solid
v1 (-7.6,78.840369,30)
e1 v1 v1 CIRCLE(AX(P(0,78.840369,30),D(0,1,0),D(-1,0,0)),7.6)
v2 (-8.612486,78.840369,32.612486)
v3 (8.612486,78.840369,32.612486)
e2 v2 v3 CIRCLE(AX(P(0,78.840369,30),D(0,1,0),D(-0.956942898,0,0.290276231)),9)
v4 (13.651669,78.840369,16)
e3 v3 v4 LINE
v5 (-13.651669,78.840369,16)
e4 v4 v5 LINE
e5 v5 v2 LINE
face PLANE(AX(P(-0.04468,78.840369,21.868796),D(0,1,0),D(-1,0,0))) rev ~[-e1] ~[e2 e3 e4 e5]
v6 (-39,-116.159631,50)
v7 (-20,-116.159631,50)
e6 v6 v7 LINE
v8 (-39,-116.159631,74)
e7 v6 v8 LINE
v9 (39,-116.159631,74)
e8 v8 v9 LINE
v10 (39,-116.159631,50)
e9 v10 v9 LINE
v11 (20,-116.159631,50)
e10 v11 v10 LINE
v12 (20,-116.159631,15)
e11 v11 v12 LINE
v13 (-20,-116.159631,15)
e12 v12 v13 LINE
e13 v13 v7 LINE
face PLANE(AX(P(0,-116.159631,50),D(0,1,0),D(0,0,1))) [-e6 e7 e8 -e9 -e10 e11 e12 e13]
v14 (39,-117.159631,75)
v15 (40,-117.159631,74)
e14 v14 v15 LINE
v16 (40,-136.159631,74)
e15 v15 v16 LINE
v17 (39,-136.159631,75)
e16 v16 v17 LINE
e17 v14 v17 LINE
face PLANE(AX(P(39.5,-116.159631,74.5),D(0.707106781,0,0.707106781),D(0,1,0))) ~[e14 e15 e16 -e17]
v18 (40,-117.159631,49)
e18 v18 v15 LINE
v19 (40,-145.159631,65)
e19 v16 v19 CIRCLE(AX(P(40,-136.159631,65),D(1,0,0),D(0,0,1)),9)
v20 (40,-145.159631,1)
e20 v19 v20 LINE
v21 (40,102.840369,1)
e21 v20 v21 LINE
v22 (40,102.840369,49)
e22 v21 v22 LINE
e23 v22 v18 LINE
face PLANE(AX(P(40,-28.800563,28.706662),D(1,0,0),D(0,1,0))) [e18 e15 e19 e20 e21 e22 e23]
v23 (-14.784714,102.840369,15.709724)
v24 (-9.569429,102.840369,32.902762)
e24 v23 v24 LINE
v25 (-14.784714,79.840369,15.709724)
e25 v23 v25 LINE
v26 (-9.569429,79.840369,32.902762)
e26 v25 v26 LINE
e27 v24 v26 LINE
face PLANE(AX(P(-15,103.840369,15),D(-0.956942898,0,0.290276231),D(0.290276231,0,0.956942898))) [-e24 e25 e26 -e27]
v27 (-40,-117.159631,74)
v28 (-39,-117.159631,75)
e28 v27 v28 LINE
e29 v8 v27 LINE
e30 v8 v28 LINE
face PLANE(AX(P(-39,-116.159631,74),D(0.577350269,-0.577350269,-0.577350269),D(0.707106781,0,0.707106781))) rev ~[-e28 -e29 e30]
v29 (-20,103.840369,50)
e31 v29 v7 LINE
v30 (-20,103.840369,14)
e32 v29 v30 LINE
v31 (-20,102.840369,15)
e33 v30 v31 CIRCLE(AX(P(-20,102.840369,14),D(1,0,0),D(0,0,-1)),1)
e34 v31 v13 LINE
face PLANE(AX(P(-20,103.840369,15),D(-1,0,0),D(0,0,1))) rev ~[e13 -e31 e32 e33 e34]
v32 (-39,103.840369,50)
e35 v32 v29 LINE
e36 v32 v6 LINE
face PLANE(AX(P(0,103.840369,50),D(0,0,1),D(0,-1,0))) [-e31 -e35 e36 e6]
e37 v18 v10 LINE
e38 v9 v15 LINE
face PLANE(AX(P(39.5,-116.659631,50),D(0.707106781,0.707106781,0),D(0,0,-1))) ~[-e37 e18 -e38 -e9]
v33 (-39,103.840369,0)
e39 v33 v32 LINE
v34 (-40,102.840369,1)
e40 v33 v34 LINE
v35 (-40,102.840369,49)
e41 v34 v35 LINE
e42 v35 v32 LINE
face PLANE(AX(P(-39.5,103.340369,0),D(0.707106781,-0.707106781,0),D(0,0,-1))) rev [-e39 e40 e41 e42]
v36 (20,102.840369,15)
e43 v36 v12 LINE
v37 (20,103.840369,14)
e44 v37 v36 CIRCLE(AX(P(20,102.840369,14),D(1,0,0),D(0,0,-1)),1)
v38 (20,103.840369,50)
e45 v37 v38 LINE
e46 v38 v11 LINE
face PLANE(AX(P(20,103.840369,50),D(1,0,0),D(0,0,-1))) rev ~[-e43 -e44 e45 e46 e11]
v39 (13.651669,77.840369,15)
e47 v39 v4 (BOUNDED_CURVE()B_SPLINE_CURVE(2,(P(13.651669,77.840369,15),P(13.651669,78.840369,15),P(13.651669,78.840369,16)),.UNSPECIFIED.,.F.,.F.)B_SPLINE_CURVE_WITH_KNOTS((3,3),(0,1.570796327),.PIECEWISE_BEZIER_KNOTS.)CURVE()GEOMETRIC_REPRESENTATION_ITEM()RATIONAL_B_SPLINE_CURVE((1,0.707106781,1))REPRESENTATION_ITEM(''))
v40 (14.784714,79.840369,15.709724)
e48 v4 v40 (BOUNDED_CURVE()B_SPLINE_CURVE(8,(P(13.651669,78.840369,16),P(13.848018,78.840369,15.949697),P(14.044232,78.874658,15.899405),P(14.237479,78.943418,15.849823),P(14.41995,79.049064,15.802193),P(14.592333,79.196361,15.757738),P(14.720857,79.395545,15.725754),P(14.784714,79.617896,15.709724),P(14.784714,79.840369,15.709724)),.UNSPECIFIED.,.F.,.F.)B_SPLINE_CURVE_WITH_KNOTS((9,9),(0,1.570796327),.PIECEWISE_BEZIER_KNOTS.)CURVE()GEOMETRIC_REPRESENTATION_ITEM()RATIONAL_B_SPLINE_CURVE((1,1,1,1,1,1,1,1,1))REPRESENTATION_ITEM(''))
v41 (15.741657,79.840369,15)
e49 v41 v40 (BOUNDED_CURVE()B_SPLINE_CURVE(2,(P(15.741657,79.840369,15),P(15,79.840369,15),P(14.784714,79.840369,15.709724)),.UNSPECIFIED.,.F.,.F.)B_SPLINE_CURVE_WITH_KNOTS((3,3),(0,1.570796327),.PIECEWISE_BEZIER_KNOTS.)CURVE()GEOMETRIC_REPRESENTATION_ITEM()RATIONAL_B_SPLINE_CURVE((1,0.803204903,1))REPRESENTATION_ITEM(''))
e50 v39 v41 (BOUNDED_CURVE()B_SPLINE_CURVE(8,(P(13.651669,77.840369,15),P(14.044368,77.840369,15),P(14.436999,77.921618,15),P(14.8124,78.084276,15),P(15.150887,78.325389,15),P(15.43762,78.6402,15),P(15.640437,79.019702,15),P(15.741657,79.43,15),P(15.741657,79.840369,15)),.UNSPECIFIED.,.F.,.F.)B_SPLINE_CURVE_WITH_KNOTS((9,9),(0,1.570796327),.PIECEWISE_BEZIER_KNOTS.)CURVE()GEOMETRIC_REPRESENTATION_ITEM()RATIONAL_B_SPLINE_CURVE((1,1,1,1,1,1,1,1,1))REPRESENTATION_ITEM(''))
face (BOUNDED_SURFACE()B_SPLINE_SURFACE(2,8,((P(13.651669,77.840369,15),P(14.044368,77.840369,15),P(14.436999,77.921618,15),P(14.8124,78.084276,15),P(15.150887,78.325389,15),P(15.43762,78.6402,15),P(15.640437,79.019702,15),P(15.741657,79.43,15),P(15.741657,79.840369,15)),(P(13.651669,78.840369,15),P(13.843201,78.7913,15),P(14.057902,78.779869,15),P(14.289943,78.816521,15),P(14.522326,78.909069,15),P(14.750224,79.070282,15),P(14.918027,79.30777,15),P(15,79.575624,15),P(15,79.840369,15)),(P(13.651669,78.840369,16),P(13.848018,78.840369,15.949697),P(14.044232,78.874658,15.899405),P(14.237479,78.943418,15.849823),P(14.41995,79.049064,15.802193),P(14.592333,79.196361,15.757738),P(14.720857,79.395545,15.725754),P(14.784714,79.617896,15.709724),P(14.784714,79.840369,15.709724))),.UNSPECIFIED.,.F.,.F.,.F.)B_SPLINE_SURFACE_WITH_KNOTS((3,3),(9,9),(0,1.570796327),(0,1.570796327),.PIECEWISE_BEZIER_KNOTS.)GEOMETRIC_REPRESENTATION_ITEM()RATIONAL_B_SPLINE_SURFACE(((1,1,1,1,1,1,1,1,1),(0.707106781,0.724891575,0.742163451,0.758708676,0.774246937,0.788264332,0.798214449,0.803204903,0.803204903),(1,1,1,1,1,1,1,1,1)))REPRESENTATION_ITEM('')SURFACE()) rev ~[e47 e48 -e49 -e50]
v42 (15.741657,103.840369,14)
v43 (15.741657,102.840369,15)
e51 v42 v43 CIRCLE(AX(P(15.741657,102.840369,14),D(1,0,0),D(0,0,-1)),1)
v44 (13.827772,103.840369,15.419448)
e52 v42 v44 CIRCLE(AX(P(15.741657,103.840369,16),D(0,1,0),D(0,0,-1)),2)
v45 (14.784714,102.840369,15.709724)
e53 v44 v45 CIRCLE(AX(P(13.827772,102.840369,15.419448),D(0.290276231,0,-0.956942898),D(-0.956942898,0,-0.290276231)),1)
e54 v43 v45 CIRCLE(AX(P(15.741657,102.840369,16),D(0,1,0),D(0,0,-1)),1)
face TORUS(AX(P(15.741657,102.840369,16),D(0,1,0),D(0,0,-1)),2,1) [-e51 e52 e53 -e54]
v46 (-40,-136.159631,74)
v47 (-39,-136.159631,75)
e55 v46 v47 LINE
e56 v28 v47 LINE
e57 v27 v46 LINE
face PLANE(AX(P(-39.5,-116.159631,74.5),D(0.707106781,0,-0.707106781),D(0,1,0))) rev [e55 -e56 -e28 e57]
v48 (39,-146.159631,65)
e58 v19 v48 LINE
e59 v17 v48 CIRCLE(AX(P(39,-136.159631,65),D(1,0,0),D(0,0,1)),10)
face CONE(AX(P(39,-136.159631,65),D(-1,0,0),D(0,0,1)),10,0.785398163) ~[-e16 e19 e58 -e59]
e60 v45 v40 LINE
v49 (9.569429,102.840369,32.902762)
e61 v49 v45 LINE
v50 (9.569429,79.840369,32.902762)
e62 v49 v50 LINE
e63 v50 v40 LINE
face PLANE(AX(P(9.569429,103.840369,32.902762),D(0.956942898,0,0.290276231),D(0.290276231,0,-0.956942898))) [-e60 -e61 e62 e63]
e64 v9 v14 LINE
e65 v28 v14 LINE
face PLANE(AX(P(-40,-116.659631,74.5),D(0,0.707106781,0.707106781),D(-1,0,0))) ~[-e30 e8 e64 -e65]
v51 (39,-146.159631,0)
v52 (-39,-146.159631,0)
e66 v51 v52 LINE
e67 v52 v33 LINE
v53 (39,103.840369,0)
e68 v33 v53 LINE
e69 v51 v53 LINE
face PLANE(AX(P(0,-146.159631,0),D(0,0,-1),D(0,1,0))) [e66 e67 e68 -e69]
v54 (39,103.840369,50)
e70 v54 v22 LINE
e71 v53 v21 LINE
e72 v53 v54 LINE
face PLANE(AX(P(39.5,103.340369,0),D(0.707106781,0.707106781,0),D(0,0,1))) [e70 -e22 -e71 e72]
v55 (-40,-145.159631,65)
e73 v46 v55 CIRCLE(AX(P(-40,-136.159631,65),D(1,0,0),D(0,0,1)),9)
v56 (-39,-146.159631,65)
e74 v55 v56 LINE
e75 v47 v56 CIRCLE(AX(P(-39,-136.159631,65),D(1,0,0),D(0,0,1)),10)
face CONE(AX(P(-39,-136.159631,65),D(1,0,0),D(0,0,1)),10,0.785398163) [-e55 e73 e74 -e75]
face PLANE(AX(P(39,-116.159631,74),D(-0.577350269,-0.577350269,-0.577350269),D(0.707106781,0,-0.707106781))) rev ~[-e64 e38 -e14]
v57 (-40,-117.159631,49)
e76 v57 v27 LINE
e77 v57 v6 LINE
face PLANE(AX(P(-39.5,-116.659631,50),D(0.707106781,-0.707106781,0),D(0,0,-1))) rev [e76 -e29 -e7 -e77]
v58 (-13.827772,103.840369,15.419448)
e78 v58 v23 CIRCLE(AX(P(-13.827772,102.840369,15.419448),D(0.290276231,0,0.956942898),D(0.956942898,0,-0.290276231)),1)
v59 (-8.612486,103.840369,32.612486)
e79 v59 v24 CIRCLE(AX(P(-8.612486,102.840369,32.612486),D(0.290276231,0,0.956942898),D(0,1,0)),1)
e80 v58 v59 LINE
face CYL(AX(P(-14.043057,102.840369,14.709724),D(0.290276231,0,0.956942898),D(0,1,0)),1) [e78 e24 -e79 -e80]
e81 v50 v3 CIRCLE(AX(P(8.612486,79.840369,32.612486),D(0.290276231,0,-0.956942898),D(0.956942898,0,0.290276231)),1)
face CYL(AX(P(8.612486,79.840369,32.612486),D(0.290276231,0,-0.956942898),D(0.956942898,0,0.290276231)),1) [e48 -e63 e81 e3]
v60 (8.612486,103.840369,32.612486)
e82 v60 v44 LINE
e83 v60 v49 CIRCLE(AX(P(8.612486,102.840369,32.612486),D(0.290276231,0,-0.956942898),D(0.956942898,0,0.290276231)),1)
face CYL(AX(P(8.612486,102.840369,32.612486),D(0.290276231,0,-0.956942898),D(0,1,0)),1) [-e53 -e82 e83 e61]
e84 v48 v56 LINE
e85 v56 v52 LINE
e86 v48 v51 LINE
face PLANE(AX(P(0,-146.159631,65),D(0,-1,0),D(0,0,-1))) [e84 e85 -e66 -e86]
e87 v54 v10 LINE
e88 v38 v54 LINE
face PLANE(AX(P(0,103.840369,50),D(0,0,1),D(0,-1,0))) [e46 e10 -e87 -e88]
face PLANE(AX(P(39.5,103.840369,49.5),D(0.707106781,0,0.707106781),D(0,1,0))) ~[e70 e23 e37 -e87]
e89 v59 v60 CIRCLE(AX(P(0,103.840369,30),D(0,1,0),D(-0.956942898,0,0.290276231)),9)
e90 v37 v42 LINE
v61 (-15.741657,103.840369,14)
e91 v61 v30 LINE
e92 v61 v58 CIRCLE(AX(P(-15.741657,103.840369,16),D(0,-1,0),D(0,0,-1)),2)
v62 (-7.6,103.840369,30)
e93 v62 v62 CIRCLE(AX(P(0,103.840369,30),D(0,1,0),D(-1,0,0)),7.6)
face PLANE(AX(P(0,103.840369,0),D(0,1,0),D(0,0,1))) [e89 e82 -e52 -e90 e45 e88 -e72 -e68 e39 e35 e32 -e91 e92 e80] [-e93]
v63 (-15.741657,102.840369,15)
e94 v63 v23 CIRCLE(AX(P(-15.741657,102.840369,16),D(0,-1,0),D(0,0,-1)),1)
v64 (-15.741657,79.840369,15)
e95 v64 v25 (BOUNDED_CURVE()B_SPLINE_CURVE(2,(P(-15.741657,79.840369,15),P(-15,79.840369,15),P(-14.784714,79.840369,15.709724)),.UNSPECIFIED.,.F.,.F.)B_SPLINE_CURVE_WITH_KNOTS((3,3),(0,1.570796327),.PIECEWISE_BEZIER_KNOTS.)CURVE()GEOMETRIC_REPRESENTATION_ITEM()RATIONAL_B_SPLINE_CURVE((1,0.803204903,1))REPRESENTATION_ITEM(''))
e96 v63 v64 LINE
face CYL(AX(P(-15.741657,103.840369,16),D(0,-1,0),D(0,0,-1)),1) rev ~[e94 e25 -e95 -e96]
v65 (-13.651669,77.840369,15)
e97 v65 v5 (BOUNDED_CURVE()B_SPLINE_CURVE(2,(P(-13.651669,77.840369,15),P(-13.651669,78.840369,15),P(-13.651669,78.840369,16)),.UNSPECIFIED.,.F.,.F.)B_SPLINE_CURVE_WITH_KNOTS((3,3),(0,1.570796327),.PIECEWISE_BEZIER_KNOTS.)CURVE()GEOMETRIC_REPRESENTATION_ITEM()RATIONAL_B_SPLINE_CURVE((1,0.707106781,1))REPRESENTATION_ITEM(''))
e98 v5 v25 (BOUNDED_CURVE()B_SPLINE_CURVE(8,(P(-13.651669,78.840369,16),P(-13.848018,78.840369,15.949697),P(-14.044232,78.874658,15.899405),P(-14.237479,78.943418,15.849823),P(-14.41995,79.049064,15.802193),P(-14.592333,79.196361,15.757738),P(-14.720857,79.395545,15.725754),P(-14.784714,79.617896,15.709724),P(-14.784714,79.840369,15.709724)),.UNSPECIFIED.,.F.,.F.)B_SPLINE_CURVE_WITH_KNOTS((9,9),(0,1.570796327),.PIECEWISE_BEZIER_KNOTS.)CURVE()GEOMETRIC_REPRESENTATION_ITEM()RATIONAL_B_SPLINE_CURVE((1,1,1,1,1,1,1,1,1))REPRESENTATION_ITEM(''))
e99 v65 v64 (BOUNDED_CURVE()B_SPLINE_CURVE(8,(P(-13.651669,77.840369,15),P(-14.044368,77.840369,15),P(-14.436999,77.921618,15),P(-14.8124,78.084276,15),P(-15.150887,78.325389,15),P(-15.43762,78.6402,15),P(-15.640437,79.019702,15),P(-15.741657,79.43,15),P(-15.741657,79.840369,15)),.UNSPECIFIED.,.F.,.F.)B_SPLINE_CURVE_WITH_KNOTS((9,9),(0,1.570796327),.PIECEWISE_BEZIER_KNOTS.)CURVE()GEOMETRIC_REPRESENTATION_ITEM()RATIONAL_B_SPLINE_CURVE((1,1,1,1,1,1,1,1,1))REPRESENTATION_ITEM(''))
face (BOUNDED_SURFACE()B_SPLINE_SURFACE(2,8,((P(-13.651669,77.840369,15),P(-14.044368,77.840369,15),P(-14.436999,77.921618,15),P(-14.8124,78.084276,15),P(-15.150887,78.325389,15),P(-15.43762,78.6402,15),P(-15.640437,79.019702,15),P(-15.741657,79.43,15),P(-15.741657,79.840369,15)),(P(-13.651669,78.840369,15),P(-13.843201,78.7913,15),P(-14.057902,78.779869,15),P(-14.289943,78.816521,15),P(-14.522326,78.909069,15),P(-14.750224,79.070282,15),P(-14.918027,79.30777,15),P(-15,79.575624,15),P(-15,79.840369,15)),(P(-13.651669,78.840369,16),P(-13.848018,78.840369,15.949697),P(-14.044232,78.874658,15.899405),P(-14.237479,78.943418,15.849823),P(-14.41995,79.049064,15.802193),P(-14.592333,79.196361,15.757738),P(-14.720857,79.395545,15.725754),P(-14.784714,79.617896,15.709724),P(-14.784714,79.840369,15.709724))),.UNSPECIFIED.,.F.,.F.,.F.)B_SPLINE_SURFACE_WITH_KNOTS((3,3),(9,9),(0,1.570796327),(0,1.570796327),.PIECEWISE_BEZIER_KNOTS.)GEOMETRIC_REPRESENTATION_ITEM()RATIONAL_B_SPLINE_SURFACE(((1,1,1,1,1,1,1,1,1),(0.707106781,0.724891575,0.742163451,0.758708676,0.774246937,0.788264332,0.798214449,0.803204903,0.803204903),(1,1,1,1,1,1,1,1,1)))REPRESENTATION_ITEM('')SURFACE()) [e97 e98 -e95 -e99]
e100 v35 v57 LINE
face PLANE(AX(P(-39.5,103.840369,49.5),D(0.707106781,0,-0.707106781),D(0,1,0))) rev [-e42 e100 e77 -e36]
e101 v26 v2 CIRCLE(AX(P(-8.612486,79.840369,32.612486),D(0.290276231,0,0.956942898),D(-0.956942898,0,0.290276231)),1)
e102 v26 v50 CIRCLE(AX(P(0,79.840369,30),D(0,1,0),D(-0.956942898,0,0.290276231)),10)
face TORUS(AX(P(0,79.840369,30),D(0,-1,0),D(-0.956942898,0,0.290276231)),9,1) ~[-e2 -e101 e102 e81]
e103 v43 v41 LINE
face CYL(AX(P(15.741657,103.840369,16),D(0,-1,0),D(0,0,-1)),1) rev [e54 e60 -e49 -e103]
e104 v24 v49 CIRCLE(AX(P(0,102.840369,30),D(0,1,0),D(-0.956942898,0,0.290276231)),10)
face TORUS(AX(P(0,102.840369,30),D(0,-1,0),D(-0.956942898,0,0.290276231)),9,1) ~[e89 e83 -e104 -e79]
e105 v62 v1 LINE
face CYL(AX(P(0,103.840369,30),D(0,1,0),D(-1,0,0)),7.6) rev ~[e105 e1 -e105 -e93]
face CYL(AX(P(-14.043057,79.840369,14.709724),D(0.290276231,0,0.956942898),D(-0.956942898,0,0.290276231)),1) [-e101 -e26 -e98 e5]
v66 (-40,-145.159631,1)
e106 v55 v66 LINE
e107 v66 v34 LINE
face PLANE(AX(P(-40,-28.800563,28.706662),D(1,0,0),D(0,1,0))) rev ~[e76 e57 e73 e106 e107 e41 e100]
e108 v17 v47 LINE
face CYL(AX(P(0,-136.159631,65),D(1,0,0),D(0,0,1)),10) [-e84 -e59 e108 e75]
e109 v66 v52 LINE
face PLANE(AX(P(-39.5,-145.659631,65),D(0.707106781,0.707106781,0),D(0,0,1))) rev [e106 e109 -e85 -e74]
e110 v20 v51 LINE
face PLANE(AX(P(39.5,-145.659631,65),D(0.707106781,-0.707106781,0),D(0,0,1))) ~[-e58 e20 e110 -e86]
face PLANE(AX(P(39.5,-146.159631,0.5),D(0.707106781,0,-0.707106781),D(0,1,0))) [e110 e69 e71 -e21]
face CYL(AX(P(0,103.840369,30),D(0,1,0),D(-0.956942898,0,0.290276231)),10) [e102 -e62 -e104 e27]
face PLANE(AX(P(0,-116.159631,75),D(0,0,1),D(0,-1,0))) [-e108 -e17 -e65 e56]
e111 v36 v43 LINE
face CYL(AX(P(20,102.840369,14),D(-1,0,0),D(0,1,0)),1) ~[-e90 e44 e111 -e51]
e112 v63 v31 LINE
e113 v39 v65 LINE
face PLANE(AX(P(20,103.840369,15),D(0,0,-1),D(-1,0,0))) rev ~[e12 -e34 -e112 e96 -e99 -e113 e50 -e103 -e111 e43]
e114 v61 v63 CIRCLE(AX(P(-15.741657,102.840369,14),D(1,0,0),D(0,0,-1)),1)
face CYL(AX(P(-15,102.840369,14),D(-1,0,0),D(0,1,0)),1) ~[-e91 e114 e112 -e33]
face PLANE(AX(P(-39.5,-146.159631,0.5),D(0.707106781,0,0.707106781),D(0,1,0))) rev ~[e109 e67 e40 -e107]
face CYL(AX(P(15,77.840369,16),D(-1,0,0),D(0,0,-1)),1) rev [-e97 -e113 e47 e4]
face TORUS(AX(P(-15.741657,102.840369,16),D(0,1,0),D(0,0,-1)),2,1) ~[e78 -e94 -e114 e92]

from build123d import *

# Parameters (mm, degrees)
F1_DEPTH = 40
F2_R     = 7.6
F3_DEPTH = 220
F4_DEPTH = 25
F5_SIZE  = 1
F6_R     = 1


with BuildPart() as f1:
    # F0 (on Right) → F1 (new body, symmetric)
    with BuildSketch(Plane.YZ):
        with BuildLine():
            Line((-146.159631235, 0), (0, 0))
            Line((0, 0), (45.9261649855, 0))
            Line((45.9261649855, 0), (103.840368765, 0))
            Line((103.840368765, 0), (103.840368765, 50))
            Line((103.840368765, 50), (-116.159631235, 50))
            Line((-116.159631235, 50), (-116.159631235, 75))
            Line((-116.159631235, 75), (-136.159631235, 75))
            ThreePointArc((-136.159631235, 75), (-143.2306990468, 72.0710678119), (-146.159631235, 65))
            Line((-146.159631235, 65), (-146.159631235, 0))
        make_face()
    extrude(amount=F1_DEPTH, both=True)

    # F2 (on face) → F3 (cut, through all)
    with BuildSketch(Plane(origin=(0, 103.840368765, 0), x_dir=(-1, 0, 0), z_dir=(0, 1, 0))):
        with BuildLine():
            Line((20, 15), (20, 50))
            Line((20, 50), (-20, 50))
            Line((-20, 50), (-20, 15))
            Line((-20, 15), (-15, 15))
            Line((-15, 15), (-9.569428978, 32.9027623113))
            ThreePointArc((-9.569428978, 32.9027623113), (0, 40), (9.569428978, 32.9027623113))
            Line((9.569428978, 32.9027623113), (15, 15))
            Line((15, 15), (20, 15))
        make_face()
        with BuildLine():
            ThreePointArc((10, 30), (9.8917715749, 31.4672610914), (9.569428978, 32.9027623113))
            ThreePointArc((9.569428978, 32.9027623113), (0, 40), (-9.569428978, 32.9027623113))
            ThreePointArc((-9.569428978, 32.9027623113), (-1.4672610914, 20.1082284251), (10, 30))
        make_face()
        with Locations((0, 30)):
            Circle(F2_R, mode=Mode.SUBTRACT)
        with BuildLine():
            Line((-15, 15), (15, 15))
            Line((15, 15), (9.569428978, 32.9027623113))
            ThreePointArc((9.569428978, 32.9027623113), (9.8917715749, 31.4672610914), (10, 30))
            ThreePointArc((10, 30), (-1.4672610914, 20.1082284251), (-9.569428978, 32.9027623113))
            Line((-9.569428978, 32.9027623113), (-15, 15))
        make_face()
        with Locations((0, 30)):
            Circle(F2_R)
    extrude(amount=-F3_DEPTH, mode=Mode.SUBTRACT)

    # F2 (on face) → F4 (join)
    with BuildSketch(Plane(origin=(0, 103.840368765, 0), x_dir=(-1, 0, 0), z_dir=(0, 1, 0))):
        with BuildLine():
            Line((-15, 15), (15, 15))
            Line((15, 15), (9.569428978, 32.9027623113))
            ThreePointArc((9.569428978, 32.9027623113), (9.8917715749, 31.4672610914), (10, 30))
            ThreePointArc((10, 30), (-1.4672610914, 20.1082284251), (-9.569428978, 32.9027623113))
            Line((-9.569428978, 32.9027623113), (-15, 15))
        make_face()
        with BuildLine():
            ThreePointArc((10, 30), (9.8917715749, 31.4672610914), (9.569428978, 32.9027623113))
            ThreePointArc((9.569428978, 32.9027623113), (0, 40), (-9.569428978, 32.9027623113))
            ThreePointArc((-9.569428978, 32.9027623113), (-1.4672610914, 20.1082284251), (10, 30))
        make_face()
        with Locations((0, 30)):
            Circle(F2_R, mode=Mode.SUBTRACT)
    extrude(amount=-F4_DEPTH)

    # F5
    f5_edges = [f1.edges().sort_by_distance(p)[0] for p in [
        (-40, -146.159631, 32.5),
        (-40, -21.159631, 0),
        (-40, 103.840369, 25),
        (-40, -6.159631, 50),
        (-40, -116.159631, 62.5),
        (-40, -126.159631, 75),
        (-40, -143.230699, 72.071068),
        (0, -136.159631, 75),
        (40, -126.159631, 75),
        (0, -116.159631, 75),
        (40, -146.159631, 32.5),
        (40, -21.159631, 0),
        (40, 103.840369, 25),
        (40, -6.159631, 50),
        (40, -116.159631, 62.5),
        (40, -143.230699, 72.071068),
    ]]
    chamfer(f5_edges, length=F5_SIZE)

    # F6
    f6_edges = [f1.edges().sort_by_distance(p)[0] for p in [
        (-12.284714, 103.840369, 23.951381),
        (-15, 91.340369, 15),
        (15, 91.340369, 15),
        (0, 78.840369, 40),
        (-17.5, 103.840369, 15),
        (17.5, 103.840369, 15),
        (12.284714, 103.840369, 23.951381),
        (0, 103.840369, 40),
        (0, 78.840369, 15),
        (-12.284714, 78.840369, 23.951381),
        (12.284714, 78.840369, 23.951381),
    ]]
    fillet(f6_edges, radius=F6_R)


solid = f1.part
